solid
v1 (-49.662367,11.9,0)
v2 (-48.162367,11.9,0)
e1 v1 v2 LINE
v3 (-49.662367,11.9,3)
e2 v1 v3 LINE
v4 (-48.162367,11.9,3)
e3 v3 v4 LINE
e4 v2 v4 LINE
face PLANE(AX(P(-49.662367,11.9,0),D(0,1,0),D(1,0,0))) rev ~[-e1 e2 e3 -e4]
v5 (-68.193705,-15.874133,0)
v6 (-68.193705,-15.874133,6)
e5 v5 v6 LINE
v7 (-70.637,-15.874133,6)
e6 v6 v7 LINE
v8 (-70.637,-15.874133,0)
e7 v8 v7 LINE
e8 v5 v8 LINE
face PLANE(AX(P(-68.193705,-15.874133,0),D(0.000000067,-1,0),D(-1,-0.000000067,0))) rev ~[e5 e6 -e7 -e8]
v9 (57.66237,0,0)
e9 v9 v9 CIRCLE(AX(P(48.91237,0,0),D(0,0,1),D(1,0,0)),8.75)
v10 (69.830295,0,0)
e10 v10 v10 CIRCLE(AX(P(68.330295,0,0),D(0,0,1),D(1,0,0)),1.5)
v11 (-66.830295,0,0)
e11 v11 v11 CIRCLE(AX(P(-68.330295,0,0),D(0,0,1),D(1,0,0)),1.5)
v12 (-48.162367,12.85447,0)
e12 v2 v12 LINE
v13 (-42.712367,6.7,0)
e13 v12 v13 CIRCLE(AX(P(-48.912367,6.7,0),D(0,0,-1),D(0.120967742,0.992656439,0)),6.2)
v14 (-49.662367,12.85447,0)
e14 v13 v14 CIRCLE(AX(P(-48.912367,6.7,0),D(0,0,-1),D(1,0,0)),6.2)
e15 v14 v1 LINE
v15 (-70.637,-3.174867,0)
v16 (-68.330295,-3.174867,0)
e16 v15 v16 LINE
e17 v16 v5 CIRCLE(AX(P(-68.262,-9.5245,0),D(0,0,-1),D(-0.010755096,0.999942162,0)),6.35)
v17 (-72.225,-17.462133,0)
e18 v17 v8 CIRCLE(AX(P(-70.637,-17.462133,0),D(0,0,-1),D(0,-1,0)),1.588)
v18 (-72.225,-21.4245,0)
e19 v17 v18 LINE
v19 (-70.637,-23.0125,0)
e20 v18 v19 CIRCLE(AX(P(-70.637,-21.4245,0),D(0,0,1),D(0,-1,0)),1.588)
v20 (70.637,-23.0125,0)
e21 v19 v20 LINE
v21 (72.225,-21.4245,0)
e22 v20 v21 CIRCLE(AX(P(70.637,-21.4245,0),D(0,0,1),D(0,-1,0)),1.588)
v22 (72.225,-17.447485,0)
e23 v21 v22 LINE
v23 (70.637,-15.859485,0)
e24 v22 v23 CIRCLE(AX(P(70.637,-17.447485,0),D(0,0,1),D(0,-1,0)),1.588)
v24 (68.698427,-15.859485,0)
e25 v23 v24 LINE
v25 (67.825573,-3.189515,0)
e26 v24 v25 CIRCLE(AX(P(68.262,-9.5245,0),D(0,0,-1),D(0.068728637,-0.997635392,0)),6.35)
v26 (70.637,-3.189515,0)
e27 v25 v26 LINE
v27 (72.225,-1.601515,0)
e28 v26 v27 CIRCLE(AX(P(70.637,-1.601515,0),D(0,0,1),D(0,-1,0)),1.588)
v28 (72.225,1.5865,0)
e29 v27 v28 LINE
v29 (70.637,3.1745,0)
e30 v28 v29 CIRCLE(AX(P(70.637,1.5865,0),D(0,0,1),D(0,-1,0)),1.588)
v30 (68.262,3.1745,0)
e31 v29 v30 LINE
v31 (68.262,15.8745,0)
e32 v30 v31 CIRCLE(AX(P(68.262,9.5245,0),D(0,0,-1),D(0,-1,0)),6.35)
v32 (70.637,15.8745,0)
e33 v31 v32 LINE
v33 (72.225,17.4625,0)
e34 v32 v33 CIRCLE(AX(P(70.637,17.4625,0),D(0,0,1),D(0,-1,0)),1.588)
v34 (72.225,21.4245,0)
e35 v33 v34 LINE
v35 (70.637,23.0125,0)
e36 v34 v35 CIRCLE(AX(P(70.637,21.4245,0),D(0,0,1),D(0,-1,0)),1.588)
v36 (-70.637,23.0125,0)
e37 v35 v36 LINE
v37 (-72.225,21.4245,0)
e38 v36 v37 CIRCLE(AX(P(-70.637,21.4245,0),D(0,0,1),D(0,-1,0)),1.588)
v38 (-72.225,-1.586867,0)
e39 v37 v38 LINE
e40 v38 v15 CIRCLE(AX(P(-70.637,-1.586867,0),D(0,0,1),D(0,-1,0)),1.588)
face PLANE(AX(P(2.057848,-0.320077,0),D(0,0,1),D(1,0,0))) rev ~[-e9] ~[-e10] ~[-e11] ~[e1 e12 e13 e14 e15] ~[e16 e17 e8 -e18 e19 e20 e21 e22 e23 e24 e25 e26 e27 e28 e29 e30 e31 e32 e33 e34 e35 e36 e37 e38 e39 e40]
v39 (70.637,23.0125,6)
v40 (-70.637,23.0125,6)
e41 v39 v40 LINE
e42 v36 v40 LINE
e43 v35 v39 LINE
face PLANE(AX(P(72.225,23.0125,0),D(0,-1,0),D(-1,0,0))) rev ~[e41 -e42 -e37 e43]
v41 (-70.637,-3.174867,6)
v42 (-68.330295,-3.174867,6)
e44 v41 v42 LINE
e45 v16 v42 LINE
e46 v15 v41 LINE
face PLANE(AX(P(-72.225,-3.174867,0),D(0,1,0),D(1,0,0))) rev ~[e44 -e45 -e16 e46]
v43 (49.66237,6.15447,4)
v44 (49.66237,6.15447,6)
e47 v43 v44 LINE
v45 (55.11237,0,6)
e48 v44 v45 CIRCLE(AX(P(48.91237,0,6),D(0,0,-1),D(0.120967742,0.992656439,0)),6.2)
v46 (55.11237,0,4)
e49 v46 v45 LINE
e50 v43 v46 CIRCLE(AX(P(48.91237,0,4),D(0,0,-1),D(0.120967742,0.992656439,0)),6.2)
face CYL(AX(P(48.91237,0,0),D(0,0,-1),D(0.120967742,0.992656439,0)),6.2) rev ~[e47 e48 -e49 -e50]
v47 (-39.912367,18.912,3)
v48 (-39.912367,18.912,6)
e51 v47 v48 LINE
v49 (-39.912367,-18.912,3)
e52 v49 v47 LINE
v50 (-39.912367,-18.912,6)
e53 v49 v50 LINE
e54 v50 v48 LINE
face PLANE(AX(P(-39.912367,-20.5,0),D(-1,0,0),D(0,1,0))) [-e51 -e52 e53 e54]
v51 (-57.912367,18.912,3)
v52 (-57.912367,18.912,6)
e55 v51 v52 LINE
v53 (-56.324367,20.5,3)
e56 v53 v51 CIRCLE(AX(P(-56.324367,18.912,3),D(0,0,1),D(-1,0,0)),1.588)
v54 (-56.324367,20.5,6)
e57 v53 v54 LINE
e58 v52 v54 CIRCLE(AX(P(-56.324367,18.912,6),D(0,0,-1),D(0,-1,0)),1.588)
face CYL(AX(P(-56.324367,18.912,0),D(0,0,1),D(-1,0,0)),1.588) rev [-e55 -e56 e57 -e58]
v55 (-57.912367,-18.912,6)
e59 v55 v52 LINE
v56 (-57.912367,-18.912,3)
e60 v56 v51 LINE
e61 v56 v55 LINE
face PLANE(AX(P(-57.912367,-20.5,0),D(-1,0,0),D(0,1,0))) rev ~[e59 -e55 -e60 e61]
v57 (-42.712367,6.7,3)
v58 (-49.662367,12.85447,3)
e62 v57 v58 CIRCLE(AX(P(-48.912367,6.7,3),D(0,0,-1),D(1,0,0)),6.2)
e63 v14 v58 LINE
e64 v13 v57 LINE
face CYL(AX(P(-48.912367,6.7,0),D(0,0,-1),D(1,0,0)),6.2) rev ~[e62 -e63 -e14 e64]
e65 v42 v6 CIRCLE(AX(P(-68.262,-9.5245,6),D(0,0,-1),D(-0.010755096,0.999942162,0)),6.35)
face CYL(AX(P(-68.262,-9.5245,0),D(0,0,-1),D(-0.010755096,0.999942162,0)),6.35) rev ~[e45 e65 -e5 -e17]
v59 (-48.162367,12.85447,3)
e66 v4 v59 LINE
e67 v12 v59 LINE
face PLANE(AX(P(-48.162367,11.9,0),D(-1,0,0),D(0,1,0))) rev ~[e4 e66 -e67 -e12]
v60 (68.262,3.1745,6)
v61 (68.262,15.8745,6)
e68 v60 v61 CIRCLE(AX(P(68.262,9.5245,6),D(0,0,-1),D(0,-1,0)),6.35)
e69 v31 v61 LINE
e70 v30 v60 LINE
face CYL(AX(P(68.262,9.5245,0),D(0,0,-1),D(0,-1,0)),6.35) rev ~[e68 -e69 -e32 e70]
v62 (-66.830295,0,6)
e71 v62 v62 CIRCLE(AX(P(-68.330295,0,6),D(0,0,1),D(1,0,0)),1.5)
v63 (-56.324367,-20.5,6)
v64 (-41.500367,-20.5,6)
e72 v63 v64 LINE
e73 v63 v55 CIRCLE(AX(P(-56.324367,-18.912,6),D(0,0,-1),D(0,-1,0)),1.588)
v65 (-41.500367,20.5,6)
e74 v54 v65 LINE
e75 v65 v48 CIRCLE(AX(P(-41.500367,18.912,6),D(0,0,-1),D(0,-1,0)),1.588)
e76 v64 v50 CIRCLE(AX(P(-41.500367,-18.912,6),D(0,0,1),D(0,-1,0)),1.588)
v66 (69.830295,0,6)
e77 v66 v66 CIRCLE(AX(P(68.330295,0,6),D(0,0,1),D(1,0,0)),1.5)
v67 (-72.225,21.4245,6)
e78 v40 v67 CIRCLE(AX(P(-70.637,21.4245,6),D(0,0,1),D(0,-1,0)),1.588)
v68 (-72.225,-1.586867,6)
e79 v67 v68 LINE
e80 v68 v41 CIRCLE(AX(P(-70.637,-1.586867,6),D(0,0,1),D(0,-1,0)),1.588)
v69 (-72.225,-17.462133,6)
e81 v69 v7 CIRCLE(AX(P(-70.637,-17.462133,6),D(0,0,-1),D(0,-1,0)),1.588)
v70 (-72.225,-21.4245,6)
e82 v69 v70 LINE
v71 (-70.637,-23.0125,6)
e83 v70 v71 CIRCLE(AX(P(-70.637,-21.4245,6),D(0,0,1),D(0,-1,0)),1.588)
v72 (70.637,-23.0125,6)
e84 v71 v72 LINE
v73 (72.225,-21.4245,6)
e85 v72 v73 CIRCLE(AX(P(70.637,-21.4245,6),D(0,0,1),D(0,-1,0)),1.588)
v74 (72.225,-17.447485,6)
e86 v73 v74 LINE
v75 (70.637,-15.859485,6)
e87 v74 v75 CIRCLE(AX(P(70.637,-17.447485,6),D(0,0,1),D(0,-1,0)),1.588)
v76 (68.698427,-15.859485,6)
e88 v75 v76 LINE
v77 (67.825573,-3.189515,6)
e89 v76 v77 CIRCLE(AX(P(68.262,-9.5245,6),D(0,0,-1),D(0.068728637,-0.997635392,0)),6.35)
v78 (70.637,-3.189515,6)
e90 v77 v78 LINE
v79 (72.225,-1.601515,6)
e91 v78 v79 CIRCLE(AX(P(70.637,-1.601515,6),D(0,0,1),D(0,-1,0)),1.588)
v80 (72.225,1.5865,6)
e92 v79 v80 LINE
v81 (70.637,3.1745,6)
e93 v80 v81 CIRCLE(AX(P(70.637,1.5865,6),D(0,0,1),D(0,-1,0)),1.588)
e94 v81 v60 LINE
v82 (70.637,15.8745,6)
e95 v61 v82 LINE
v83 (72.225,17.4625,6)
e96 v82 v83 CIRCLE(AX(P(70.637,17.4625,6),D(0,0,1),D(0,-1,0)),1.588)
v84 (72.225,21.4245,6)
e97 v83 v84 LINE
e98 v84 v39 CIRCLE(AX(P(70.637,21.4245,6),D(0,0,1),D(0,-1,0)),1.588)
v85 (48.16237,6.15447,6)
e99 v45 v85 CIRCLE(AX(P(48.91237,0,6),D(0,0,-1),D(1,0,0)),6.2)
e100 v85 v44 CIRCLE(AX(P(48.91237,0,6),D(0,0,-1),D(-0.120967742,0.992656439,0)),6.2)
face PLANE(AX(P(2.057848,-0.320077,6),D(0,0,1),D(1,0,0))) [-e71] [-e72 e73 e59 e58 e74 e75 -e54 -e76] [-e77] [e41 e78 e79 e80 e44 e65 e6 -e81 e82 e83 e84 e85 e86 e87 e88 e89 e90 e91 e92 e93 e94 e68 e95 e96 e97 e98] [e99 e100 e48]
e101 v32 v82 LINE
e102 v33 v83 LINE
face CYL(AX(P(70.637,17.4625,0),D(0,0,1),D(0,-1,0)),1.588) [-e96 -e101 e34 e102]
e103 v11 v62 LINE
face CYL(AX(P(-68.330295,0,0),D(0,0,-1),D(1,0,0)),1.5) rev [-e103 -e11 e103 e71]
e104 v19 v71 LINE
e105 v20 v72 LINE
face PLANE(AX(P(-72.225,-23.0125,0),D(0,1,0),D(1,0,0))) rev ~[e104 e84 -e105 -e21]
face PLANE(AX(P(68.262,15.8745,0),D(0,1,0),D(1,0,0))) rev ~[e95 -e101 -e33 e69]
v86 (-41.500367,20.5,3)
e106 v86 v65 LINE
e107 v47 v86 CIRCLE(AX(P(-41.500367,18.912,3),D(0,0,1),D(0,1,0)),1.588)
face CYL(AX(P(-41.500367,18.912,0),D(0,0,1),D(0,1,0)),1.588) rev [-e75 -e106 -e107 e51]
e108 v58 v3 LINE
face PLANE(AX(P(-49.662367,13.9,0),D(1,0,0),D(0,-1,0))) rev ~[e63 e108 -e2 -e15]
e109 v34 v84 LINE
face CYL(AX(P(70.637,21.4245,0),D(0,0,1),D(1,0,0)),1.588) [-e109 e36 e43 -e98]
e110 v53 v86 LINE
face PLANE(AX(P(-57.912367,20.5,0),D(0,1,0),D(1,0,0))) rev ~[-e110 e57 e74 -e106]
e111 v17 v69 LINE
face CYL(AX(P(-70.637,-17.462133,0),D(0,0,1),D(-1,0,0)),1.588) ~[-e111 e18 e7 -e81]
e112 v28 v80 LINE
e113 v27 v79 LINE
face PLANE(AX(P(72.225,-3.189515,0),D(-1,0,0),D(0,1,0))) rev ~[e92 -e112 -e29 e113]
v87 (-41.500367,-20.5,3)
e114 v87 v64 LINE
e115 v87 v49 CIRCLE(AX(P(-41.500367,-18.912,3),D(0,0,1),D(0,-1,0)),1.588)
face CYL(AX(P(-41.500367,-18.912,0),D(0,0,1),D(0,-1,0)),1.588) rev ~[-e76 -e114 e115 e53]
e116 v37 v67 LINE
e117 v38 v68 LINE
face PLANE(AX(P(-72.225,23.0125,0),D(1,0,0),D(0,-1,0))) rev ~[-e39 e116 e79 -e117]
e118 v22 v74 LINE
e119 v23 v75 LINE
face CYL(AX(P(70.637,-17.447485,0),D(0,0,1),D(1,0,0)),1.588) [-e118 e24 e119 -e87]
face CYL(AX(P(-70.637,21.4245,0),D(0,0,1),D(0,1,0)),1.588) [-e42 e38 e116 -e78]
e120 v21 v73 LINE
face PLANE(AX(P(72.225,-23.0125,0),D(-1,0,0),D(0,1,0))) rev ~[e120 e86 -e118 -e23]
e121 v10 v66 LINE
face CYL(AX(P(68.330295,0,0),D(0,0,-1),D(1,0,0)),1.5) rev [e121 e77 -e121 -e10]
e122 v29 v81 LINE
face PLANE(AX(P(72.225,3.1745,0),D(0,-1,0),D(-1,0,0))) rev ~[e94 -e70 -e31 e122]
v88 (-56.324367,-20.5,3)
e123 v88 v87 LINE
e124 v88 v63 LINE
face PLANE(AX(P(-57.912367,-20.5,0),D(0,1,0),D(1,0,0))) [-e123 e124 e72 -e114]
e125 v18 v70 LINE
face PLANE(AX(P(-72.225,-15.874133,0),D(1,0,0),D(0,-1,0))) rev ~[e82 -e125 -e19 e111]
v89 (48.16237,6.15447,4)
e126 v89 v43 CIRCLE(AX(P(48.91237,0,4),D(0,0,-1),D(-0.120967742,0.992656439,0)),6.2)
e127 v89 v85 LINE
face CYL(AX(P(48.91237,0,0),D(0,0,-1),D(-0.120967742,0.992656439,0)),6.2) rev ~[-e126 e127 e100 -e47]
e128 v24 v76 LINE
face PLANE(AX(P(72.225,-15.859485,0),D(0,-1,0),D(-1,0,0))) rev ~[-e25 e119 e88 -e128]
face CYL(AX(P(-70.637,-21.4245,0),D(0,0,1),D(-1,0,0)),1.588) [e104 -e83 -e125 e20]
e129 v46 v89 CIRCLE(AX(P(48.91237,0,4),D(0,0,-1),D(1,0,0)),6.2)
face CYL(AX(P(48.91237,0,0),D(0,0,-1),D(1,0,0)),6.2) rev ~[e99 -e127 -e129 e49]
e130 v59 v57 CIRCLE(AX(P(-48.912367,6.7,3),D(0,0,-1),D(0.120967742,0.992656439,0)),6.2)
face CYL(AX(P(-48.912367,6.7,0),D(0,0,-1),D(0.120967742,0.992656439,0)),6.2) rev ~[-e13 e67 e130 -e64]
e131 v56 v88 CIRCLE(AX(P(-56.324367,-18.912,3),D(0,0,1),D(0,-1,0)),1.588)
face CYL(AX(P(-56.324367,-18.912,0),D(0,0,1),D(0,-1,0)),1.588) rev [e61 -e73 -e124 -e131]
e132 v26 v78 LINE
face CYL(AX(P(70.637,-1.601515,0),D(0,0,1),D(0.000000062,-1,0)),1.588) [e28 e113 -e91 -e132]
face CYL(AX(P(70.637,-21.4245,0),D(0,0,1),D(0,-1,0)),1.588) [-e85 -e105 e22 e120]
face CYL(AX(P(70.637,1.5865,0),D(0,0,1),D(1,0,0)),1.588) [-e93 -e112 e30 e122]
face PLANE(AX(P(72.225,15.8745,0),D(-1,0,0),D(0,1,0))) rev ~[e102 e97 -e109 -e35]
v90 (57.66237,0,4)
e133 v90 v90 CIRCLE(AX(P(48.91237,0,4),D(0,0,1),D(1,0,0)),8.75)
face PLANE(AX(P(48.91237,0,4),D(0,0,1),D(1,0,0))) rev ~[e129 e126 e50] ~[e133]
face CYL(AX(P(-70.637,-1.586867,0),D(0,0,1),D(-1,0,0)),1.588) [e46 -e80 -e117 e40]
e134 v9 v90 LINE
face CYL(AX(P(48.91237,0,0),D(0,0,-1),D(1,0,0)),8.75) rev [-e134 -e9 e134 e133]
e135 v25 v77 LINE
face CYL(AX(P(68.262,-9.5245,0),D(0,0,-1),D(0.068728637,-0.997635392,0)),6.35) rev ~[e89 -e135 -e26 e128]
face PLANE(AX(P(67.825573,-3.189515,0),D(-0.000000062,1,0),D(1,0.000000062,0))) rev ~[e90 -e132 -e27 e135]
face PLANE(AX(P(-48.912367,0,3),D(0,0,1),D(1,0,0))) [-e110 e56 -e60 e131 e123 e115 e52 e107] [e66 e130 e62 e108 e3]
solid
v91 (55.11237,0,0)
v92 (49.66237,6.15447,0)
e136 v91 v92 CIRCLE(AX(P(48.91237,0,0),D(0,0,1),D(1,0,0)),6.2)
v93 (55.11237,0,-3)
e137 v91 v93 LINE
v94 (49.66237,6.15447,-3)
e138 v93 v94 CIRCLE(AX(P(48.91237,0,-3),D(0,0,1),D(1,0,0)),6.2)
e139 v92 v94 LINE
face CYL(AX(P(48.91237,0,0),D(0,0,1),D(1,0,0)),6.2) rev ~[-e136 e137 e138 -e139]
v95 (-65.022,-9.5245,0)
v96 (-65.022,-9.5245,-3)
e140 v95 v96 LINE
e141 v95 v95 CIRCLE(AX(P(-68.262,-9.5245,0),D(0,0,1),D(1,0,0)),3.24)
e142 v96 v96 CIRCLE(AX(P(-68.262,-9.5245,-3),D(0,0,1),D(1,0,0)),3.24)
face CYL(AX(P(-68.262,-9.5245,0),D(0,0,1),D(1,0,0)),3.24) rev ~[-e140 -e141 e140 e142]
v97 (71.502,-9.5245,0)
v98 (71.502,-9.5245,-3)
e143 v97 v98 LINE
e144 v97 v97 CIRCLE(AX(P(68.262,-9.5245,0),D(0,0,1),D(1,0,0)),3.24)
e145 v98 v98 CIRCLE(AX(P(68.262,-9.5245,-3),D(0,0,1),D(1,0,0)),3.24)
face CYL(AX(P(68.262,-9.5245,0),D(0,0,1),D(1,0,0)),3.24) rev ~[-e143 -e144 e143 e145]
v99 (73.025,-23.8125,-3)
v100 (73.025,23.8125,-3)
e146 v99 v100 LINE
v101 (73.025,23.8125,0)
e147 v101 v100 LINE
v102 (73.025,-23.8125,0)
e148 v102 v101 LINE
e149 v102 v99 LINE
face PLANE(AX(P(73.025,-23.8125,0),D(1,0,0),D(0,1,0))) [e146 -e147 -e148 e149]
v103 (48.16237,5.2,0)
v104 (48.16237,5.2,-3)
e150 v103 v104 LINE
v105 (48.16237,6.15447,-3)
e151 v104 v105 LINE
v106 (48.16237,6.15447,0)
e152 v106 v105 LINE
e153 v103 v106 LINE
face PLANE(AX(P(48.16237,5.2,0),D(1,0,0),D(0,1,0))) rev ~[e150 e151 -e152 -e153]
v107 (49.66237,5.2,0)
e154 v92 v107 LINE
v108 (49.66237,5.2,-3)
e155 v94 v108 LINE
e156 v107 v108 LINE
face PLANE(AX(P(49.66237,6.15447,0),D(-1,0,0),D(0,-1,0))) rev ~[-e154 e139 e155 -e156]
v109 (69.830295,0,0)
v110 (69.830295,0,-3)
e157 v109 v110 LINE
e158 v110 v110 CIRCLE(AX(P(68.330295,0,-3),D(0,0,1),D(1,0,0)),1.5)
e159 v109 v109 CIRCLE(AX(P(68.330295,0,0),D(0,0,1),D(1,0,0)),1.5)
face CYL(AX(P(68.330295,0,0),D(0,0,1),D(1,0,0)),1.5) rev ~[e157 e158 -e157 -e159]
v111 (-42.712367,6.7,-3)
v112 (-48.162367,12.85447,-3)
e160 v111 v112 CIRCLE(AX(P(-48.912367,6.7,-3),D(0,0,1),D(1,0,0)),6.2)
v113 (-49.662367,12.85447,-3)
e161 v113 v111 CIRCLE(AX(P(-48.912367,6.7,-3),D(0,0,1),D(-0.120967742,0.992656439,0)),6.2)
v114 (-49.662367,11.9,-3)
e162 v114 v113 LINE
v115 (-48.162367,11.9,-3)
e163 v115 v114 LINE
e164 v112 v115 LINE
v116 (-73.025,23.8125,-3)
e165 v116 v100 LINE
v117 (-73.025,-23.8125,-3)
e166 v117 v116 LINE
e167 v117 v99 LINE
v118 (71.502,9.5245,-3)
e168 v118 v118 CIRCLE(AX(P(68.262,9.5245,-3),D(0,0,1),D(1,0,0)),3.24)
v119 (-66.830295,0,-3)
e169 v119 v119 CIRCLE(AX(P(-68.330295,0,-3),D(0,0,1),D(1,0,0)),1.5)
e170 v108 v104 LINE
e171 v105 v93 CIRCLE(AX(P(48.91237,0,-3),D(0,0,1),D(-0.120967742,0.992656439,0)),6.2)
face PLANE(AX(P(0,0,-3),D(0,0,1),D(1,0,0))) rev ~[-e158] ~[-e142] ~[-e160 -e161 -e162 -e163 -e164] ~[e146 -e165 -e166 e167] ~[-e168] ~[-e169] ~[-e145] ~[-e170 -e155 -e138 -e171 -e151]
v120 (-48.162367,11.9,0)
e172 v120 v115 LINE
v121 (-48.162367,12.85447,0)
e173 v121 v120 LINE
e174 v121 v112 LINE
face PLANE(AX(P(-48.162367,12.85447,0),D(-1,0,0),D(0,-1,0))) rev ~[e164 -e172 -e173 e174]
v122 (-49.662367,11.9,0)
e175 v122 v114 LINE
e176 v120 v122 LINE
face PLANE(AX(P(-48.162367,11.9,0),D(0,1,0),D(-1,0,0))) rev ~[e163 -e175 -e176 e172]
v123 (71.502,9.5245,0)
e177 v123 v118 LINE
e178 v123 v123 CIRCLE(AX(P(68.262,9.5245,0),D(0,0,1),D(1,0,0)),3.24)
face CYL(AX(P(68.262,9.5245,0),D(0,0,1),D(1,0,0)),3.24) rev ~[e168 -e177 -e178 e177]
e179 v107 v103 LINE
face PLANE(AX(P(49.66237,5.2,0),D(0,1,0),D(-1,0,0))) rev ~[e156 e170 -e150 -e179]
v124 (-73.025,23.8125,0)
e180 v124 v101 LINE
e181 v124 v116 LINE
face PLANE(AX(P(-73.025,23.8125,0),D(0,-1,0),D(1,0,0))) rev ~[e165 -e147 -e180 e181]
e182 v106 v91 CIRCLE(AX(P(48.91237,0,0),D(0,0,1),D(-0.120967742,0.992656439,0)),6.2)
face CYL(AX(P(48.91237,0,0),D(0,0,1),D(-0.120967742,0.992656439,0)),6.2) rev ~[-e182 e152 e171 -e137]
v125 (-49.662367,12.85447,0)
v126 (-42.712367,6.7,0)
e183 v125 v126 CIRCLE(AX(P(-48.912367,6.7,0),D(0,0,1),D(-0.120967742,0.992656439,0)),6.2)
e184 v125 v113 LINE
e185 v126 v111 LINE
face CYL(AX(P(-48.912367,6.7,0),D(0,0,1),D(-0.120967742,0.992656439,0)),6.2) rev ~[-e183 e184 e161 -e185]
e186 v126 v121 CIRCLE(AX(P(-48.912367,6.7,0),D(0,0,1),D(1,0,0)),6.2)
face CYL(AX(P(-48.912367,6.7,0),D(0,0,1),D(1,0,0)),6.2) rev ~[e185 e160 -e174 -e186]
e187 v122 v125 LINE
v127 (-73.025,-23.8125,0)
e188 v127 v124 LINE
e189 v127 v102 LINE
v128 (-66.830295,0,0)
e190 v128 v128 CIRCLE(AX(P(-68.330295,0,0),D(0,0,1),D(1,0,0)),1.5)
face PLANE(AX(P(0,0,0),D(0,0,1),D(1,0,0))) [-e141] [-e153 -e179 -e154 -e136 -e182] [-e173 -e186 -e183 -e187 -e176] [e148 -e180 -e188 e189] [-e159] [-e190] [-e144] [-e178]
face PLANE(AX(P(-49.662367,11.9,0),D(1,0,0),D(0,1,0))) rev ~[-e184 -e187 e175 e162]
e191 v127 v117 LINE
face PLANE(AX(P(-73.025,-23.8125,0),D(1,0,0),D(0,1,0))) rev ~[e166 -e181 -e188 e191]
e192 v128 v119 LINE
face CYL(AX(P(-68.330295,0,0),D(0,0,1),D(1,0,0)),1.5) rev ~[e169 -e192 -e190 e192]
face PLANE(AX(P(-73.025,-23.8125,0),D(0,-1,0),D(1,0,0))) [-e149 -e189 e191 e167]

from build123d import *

# Parameters (mm, degrees)
F0_W      = 146.05
F0_H      = 47.625
F0_R      = 3.24
F0_R_2    = 1.5
F1_DEPTH  = 3
F3_DEPTH  = 25
F2_R      = 1.5
F2_W      = 18
F2_H      = 41
F4_DEPTH  = 6
F5_R      = 1.588
F6_R      = 1.5
F7_DEPTH  = 9.001
F8_R      = 8.75
F9_DEPTH  = 4
F11_DEPTH = 3


# Not quite as in the source:
# - ends of sketch curves that miss each other by under 0.0002 mm in the source are joined


with BuildPart() as f1:
    # F0 (on Top) → F1 (new body)
    with BuildSketch(Plane.XY):
        Rectangle(F0_W, F0_H)
        with Locations((-68.262, -9.5245)):
            Circle(F0_R, mode=Mode.SUBTRACT)
        with Locations((68.262, -9.5245)):
            Circle(F0_R, mode=Mode.SUBTRACT)
        with BuildLine():
            Line((72.225, -15.859485), (72.225, -23.0125))
            Line((72.225, -23.0125), (-72.225, -23.0125))
            Line((-72.225, -23.0125), (-72.225, -15.874133))
            Line((-72.225, -15.874133), (-68.193705, -15.874133))
            ThreePointArc((-68.193705, -15.874133), (-61.912367271, -9.4562050029), (-68.3302949971, -3.174867271))
            Line((-68.3302949971, -3.174867271), (-72.225, -3.174867))
            Line((-72.225, -3.174867), (-72.225, 3.1745))
            Line((-72.225, 3.1745), (-72.225, 15.8745))
            Line((-72.225, 15.8745), (-72.225, 23.0125))
            Line((-72.225, 23.0125), (72.225, 23.0125))
            Line((72.225, 23.0125), (72.225, 15.8745))
            Line((72.225, 15.8745), (68.262, 15.8745))
            ThreePointArc((68.262, 15.8745), (61.912, 9.5245), (68.262, 3.1745))
            Line((68.262, 3.1745), (72.225, 3.1745))
            Line((72.225, 3.1745), (72.225, -3.189515))
            Line((72.225, -3.189515), (67.825573, -3.189515))
            ThreePointArc((67.825573, -3.189515), (61.9270152731, -9.9609269812), (68.6984269812, -15.8594847269))
            Line((68.6984269812, -15.8594847269), (72.225, -15.859485))
        make_face(mode=Mode.SUBTRACT)
        with Locations((68.262, 9.5245)):
            Circle(F0_R, mode=Mode.SUBTRACT)
        with BuildLine():
            Line((-72.225, -23.0125), (72.225, -23.0125))
            Line((72.225, -23.0125), (72.225, -15.859485))
            Line((72.225, -15.859485), (68.698427, -15.859485))
            ThreePointArc((68.698427, -15.859485), (61.9270152731, -9.9609269812), (67.8255730188, -3.1895152731))
            Line((67.8255730188, -3.1895152731), (72.225, -3.189515))
            Line((72.225, -3.189515), (72.225, 3.1745))
            Line((72.225, 3.1745), (68.262, 3.1745))
            ThreePointArc((68.262, 3.1745), (61.912, 9.5245), (68.262, 15.8745))
            Line((68.262, 15.8745), (72.225, 15.8745))
            Line((72.225, 15.8745), (72.225, 23.0125))
            Line((72.225, 23.0125), (-72.225, 23.0125))
            Line((-72.225, 23.0125), (-72.225, 15.8745))
            Line((-72.225, 15.8745), (-72.225, 3.1745))
            Line((-72.225, 3.1745), (-72.225, -3.174867))
            Line((-72.225, -3.174867), (-68.330295, -3.174867))
            ThreePointArc((-68.330295, -3.174867), (-61.912367271, -9.4562050029), (-68.1937050029, -15.874132729))
            Line((-68.1937050029, -15.874132729), (-72.225, -15.874133))
            Line((-72.225, -15.874133), (-72.225, -23.0125))
        make_face()
        with Locations((-68.330295, 0)):
            Circle(F0_R_2, mode=Mode.SUBTRACT)
        with Locations((68.330295, 0)):
            Circle(F0_R_2, mode=Mode.SUBTRACT)
    extrude(amount=-F1_DEPTH)

    # F2 (on face) → F3 (cut)
    with BuildSketch(Plane.XY):
        with BuildLine():
            ThreePointArc((-49.662367271, 12.8544699203), (-53.0227200539, 2.0583408139), (-42.712367271, 6.7))
            ThreePointArc((-42.712367271, 6.7), (-44.2707080849, 10.8103527829), (-48.162367271, 12.8544699203))
            Line((-48.162367271, 12.8544699203), (-48.162367271, 11.9))
            Line((-48.162367271, 11.9), (-49.662367271, 11.9))
            Line((-49.662367271, 11.9), (-49.662367271, 12.8544699203))
        make_face()
        with BuildLine():
            ThreePointArc((48.16237, 6.1544699203), (44.8020172171, -4.6416591861), (55.11237, 0))
            ThreePointArc((55.11237, 0), (53.5540291861, 4.1103527829), (49.66237, 6.1544699203))
            Line((49.66237, 6.1544699203), (49.66237, 5.2))
            Line((49.66237, 5.2), (48.16237, 5.2))
            Line((48.16237, 5.2), (48.16237, 6.1544699203))
        make_face()
    extrude(amount=-F3_DEPTH, mode=Mode.SUBTRACT)

    # F6 (on face) → F7 (cut, through all)
    with BuildSketch(Plane.XY.offset(6)):
        with Locations((-68.3302949971, 0)):
            Circle(F6_R)
        with Locations((68.3302949971, 0)):
            Circle(F6_R)
    extrude(amount=-F7_DEPTH, mode=Mode.SUBTRACT)


with BuildPart() as f4:
    # F2 (on face) → F4 (new body)
    with BuildSketch(Plane.XY):
        with BuildLine():
            Line((-72.225, -15.874133), (-72.225, -23.0125))
            Line((-72.225, -23.0125), (72.225, -23.0125))
            Line((72.225, -23.0125), (72.225, -15.859485))
            Line((72.225, -15.859485), (68.698427, -15.859485))
            ThreePointArc((68.698427, -15.859485), (61.9270152731, -9.9609269812), (67.8255730188, -3.1895152731))
            Line((67.8255730188, -3.1895152731), (72.225, -3.189515))
            Line((72.225, -3.189515), (72.225, 3.1745))
            Line((72.225, 3.1745), (68.262, 3.1745))
            ThreePointArc((68.262, 3.1745), (61.912, 9.5245), (68.262, 15.8745))
            Line((68.262, 15.8745), (72.225, 15.8745))
            Line((72.225, 15.8745), (72.225, 23.0125))
            Line((72.225, 23.0125), (-72.225, 23.0125))
            Line((-72.225, 23.0125), (-72.225, 15.8745))
            Line((-72.225, 15.8745), (-72.225, 3.1745))
            Line((-72.225, 3.1745), (-72.225, -3.174867))
            Line((-72.225, -3.174867), (-68.330295, -3.174867))
            ThreePointArc((-68.330295, -3.174867), (-61.912367271, -9.4562050029), (-68.1937050029, -15.874132729))
            Line((-68.1937050029, -15.874132729), (-72.225, -15.874133))
        make_face()
        with Locations((-68.330295, 0)):
            Circle(F2_R, mode=Mode.SUBTRACT)
        with Locations((-48.912367271, 0)):
            Rectangle(F2_W, F2_H, mode=Mode.SUBTRACT)
        with BuildLine():
            ThreePointArc((49.66237, 6.1544699203), (53.5540291861, 4.1103527829), (55.11237, 0))
            ThreePointArc((55.11237, 0), (44.8020172171, -4.6416591861), (48.16237, 6.1544699203))
            Line((48.16237, 6.1544699203), (48.16237, 7.2))
            Line((48.16237, 7.2), (49.66237, 7.2))
            Line((49.66237, 7.2), (49.66237, 6.1544699203))
        make_face(mode=Mode.SUBTRACT)
        with Locations((68.330295, 0)):
            Circle(F2_R, mode=Mode.SUBTRACT)
        with BuildLine():
            ThreePointArc((48.16237, 6.1544699203), (48.91237, 6.2), (49.66237, 6.1544699203))
            Line((49.66237, 6.1544699203), (49.66237, 7.2))
            Line((49.66237, 7.2), (48.16237, 7.2))
            Line((48.16237, 7.2), (48.16237, 6.1544699203))
        make_face()
    extrude(amount=F4_DEPTH)

    # F5
    f5_edges = [f4.edges().sort_by_distance(p)[0] for p in [
        (-72.225, -23.0125, 3),
        (-72.225, -15.874133, 3),
        (-72.225, -3.174867, 3),
        (-72.225, 23.0125, 3),
        (72.225, -23.0125, 3),
        (72.225, -15.859485, 3),
        (72.225, -3.189515, 3),
        (72.225, 3.1745, 3),
        (72.225, 15.8745, 3),
        (72.225, 23.0125, 3),
        (-57.912367, 20.5, 3),
        (-39.912367, 20.5, 3),
        (-39.912367, -20.5, 3),
        (-57.912367, -20.5, 3),
    ]]
    fillet(f5_edges, radius=F5_R)

    # F8 (on face) → F9 (cut)
    with BuildSketch(Plane.XY):
        with Locations((48.91237, 0)):
            Circle(F8_R)
    extrude(amount=F9_DEPTH, mode=Mode.SUBTRACT)

    # F2 (on face) + F10 (on face) → F11 (join)
    with BuildSketch(Plane.XY):
        with Locations((-48.912367271, 0)):
            Rectangle(F2_W, F2_H)
        with BuildLine():
            ThreePointArc((-48.162367271, 12.8544699203), (-44.2707080849, 10.8103527829), (-42.712367271, 6.7))
            ThreePointArc((-42.712367271, 6.7), (-53.0227200539, 2.0583408139), (-49.662367271, 12.8544699203))
            Line((-49.662367271, 12.8544699203), (-49.662367271, 13.9))
            Line((-49.662367271, 13.9), (-48.162367271, 13.9))
            Line((-48.162367271, 13.9), (-48.162367271, 12.8544699203))
        make_face(mode=Mode.SUBTRACT)
    with BuildSketch(Plane.XY):
        with BuildLine():
            ThreePointArc((-49.662367271, 12.8544699203), (-48.912367271, 12.9), (-48.162367271, 12.8544699203))
            Line((-48.162367271, 12.8544699203), (-48.162367271, 13.9))
            Line((-48.162367271, 13.9), (-49.662367271, 13.9))
            Line((-49.662367271, 13.9), (-49.662367271, 12.8544699203))
        make_face()
        with BuildLine():
            Line((-48.162367271, 11.9), (-48.162367271, 12.8544699203))
            ThreePointArc((-48.162367271, 12.8544699203), (-48.912367271, 12.9), (-49.662367271, 12.8544699203))
            Line((-49.662367271, 12.8544699203), (-49.662367271, 11.9))
            Line((-49.662367271, 11.9), (-48.162367271, 11.9))
        make_face()
    extrude(amount=F11_DEPTH)


solid = Compound([f1.part, f4.part])
